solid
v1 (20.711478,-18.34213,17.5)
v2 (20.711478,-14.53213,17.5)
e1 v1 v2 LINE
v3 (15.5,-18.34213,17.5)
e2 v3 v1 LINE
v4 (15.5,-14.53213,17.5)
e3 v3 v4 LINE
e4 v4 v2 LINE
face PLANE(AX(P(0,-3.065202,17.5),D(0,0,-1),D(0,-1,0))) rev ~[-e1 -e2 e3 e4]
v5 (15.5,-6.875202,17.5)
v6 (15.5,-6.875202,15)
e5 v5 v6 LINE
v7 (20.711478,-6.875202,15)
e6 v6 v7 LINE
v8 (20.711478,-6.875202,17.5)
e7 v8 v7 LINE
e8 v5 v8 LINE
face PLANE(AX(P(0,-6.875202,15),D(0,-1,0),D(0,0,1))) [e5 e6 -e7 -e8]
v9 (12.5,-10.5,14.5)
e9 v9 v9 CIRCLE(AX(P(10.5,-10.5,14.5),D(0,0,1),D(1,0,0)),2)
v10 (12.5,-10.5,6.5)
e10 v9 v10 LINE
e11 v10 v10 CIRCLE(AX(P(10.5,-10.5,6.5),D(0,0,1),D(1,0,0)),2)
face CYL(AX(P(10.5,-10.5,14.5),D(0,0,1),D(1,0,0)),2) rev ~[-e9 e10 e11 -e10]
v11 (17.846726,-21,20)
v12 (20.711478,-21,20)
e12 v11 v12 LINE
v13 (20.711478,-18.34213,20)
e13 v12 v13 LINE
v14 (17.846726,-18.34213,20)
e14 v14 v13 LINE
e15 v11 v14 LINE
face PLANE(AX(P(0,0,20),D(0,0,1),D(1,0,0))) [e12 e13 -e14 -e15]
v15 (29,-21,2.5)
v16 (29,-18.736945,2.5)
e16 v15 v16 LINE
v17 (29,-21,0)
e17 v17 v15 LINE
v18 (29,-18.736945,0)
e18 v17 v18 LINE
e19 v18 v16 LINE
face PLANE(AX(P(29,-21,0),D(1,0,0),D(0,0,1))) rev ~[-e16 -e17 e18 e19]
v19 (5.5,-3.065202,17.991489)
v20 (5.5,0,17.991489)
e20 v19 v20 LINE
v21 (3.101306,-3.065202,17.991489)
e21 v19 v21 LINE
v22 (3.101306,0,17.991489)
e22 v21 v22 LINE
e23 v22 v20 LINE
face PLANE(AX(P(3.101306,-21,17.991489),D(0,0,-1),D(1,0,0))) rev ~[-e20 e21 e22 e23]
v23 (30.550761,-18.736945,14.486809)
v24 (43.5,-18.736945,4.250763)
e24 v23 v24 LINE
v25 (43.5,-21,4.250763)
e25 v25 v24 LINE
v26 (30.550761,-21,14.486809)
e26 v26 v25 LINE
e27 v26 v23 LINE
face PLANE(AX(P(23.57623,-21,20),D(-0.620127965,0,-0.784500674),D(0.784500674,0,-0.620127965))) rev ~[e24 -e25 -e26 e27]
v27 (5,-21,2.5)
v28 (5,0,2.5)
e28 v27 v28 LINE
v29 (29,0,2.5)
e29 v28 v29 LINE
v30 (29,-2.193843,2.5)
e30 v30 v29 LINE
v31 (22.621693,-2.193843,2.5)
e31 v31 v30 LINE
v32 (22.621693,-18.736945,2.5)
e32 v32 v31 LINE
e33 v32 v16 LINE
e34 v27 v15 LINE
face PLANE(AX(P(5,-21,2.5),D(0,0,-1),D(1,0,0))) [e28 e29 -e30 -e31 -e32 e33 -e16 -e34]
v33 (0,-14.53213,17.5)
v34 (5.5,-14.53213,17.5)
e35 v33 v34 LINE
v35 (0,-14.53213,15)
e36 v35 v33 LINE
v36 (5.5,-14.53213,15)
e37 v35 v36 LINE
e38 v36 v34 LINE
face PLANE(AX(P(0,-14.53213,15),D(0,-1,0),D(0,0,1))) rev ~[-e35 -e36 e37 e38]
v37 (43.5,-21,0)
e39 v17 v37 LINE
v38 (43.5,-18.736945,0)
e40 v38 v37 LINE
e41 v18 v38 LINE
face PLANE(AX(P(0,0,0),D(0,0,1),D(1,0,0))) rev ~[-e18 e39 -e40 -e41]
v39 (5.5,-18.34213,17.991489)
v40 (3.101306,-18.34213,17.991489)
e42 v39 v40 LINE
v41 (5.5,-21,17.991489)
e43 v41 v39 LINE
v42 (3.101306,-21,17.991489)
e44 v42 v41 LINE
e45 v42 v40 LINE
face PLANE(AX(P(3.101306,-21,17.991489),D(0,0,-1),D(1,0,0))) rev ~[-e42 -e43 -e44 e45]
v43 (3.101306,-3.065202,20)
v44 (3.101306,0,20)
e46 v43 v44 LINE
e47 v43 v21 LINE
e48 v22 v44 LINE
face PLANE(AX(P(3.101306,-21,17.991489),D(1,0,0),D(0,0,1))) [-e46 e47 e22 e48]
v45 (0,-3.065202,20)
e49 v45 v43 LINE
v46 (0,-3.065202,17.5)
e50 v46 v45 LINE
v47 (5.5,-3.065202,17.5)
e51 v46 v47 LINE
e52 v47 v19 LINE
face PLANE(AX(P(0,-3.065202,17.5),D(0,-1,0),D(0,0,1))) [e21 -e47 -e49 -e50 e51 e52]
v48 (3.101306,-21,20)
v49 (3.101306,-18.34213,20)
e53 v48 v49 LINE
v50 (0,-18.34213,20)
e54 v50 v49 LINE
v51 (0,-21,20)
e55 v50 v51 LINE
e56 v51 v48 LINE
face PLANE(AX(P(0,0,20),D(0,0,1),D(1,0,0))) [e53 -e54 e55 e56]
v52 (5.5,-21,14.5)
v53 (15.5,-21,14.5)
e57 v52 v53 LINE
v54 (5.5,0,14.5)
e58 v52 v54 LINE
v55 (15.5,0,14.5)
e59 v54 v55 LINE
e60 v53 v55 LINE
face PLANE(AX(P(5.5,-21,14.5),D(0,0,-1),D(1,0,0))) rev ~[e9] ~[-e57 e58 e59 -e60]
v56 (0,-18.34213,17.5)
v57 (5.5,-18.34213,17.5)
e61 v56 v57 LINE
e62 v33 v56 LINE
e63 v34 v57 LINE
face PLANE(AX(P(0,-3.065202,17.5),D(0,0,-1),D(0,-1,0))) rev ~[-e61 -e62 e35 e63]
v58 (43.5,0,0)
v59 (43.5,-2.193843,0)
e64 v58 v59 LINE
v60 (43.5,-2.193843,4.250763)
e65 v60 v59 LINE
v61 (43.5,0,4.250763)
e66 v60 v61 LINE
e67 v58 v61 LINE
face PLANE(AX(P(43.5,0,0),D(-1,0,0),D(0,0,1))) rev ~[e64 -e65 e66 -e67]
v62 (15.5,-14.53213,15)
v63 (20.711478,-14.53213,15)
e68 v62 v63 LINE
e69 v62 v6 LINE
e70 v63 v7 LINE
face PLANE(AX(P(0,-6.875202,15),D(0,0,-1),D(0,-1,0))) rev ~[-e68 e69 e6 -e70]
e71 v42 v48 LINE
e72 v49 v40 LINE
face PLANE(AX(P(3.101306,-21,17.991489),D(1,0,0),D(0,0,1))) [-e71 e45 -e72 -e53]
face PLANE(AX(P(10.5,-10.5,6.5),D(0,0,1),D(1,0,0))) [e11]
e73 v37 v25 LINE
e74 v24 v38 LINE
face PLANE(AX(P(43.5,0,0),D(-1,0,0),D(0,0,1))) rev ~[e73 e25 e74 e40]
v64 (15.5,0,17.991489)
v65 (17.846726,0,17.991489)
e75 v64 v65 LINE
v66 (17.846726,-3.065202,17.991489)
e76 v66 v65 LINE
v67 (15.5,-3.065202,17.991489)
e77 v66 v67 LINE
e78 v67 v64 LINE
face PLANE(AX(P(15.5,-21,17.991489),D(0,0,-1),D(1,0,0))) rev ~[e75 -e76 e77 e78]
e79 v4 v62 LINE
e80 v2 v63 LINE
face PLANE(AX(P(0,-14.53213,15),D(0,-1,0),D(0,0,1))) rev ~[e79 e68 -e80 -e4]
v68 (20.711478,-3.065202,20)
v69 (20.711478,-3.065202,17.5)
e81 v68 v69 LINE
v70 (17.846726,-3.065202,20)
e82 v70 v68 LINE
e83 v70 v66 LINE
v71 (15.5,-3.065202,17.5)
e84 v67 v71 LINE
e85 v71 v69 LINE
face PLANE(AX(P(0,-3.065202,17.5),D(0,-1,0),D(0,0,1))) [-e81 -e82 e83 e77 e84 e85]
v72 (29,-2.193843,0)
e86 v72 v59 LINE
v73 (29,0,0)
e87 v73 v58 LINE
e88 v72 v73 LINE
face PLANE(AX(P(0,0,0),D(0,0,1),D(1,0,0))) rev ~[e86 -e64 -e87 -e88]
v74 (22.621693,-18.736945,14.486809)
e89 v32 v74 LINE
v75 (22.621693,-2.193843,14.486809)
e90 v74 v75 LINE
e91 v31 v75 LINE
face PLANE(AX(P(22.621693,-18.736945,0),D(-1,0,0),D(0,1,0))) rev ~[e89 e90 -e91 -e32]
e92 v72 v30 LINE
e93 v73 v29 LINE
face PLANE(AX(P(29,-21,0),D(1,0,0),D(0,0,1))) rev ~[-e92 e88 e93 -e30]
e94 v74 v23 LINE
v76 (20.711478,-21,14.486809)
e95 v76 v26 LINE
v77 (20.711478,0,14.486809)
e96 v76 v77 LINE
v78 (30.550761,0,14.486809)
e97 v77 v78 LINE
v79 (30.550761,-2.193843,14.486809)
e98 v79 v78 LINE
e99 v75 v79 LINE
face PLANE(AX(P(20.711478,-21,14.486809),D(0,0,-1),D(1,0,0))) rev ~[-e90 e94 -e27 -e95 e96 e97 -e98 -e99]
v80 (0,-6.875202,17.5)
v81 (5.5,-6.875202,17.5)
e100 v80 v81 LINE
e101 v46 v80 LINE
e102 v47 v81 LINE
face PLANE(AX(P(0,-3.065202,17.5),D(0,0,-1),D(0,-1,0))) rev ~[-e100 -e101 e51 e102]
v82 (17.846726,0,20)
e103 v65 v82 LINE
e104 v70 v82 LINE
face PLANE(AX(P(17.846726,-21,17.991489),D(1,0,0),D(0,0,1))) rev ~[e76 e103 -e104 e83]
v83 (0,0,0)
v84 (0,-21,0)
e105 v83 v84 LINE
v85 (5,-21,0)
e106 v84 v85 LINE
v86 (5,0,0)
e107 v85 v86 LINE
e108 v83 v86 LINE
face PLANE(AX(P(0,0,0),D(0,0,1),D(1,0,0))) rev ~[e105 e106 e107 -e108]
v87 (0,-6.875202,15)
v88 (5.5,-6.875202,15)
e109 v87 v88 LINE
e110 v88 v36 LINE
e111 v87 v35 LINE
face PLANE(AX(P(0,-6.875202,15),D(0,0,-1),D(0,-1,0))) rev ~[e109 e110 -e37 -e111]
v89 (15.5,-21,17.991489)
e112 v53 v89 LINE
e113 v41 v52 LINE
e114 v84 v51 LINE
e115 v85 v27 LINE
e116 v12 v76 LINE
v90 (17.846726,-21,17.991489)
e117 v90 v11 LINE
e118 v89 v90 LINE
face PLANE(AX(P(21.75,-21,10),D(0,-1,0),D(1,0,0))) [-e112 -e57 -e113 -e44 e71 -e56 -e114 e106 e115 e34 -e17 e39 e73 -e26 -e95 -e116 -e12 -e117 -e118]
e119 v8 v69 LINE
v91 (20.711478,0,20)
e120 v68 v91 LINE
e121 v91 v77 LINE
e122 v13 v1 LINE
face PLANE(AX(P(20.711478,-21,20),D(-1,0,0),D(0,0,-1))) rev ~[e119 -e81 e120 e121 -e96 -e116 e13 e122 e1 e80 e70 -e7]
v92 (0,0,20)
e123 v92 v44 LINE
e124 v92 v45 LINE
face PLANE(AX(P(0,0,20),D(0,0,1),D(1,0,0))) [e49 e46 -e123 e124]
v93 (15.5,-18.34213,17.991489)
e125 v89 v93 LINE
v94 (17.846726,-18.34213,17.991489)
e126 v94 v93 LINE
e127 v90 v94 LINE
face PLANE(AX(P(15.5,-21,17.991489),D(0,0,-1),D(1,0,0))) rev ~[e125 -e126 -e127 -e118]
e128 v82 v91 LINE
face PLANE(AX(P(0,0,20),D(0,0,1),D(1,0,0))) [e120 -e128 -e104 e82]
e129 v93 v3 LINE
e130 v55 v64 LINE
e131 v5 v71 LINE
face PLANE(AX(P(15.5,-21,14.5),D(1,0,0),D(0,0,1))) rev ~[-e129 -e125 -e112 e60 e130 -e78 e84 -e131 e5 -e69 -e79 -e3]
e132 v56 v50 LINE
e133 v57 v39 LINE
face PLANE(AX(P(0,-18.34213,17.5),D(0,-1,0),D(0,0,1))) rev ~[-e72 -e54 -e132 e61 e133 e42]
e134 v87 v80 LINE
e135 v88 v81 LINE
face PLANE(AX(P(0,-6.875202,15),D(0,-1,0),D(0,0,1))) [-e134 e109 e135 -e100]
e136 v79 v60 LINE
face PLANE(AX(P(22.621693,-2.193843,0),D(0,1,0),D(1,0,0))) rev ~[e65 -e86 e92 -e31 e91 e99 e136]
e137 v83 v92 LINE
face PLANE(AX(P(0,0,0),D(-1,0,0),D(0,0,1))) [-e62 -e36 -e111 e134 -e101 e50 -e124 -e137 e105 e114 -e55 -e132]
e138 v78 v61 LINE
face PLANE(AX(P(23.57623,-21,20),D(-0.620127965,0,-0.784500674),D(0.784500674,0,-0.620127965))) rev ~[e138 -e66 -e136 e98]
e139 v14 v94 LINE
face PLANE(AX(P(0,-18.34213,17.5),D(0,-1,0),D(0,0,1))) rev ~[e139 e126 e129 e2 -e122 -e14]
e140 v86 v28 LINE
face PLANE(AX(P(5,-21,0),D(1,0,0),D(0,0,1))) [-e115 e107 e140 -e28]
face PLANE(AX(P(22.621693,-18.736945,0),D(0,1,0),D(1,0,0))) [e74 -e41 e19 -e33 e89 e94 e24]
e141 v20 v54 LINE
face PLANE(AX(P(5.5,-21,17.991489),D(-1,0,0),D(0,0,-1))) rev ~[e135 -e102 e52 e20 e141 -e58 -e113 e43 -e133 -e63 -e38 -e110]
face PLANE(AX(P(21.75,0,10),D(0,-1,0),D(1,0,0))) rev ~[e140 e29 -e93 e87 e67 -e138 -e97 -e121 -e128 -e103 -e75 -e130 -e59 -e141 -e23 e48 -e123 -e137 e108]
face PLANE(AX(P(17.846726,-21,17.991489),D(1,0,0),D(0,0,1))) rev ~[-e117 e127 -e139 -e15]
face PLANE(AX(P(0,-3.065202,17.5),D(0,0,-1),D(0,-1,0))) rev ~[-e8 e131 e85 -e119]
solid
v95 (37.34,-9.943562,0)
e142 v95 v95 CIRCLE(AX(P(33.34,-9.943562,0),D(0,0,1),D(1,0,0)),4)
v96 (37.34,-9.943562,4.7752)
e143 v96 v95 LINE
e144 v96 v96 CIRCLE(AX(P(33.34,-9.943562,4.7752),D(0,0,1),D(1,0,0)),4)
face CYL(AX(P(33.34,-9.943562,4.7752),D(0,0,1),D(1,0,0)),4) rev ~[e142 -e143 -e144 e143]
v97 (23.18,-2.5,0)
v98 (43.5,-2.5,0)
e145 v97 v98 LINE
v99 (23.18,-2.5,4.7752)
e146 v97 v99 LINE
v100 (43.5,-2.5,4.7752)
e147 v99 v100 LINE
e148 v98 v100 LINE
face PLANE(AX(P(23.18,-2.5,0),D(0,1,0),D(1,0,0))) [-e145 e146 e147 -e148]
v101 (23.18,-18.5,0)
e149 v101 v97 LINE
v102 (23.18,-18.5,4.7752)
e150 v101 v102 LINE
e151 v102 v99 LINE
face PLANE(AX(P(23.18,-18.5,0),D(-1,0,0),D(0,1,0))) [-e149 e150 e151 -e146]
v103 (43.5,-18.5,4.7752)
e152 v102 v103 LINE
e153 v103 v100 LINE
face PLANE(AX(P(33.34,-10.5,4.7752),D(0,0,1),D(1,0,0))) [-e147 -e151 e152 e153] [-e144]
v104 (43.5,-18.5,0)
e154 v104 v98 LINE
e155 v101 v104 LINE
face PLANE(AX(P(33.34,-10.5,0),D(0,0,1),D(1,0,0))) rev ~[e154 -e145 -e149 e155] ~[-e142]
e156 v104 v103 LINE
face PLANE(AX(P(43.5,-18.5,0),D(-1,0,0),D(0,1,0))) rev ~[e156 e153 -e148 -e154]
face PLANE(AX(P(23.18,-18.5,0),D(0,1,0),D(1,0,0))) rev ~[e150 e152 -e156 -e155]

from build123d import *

# Parameters (mm, degrees)
F0_W      = 43.5
F0_H      = 20
F1_DEPTH  = 21
F2_W      = 24
F2_H      = 2.5
F2_W_2    = 2.3986939639
F2_H_2    = 2.0085112005
F2_W_3    = 2.3467258811
F3_DEPTH  = 21.001
F5_DEPTH  = 21.001
F6_R      = 2
F7_DEPTH  = 8
F9_W      = 15.2769281747
F9_H      = 2.5
F10_DEPTH = 43.501
F11_W     = 7.6569281747
F11_H     = 2.5
F12_DEPTH = 43.501
F15_DEPTH = 21.001
F16_W     = 23.7473566085
F16_H     = 16.5431026835
F17_DEPTH = 25.4
F13_W     = 20.32
F13_H     = 16
F18_DEPTH = 4.7752
F8_R      = 4
F19_DEPTH = 74
F20_R     = 4
F21_DEPTH = 4.7762


# Not quite as in the source:
# - an extrude ends at something that could not be found from the text; its depth is read off the source's solid


with BuildPart() as f1:
    # F0 (on Front) → F1 (new body)
    with BuildSketch(Plane.XZ):
        with Locations((21.75, 10)):
            Rectangle(F0_W, F0_H)
    extrude(amount=F1_DEPTH)

    # F2 (on face) → F3 (cut, through all)
    with BuildSketch(Plane.XZ.offset(21)):
        Polygon((15.5, 20), (5.5, 20), (5.5, 17.9914887995), (5.5, 14.5), (15.5, 14.5), (15.5, 17.9914887995), align=None)
        with Locations((17, 1.25)):
            Rectangle(F2_W, F2_H)
        with Locations((4.3006530181, 18.9957443997)):
            Rectangle(F2_W_2, F2_H_2)
        with Locations((16.6733629405, 18.9957443997)):
            Rectangle(F2_W_3, F2_H_2)
    extrude(amount=-F3_DEPTH, mode=Mode.SUBTRACT)

    # F4 (on face) → F5 (cut, through all)
    with BuildSketch(Plane.XZ.offset(21)):
        Polygon((43.5, 20), (23.5762298107, 20), (43.5, 4.2507629842), align=None)
    extrude(amount=-F5_DEPTH, mode=Mode.SUBTRACT)

    # F6 (on face) → F7 (cut)
    with BuildSketch(Plane.XY.offset(14.5)):
        with Locations((10.5, -10.5)):
            Circle(F6_R)
    extrude(amount=-F7_DEPTH, mode=Mode.SUBTRACT)

    # F9 (on face) → F10 (cut, through all)
    with BuildSketch(Plane(origin=(0, 0, 0), x_dir=(0, -1, 0), z_dir=(-1, 0, 0))):
        with Locations((10.7036660069, 18.75)):
            Rectangle(F9_W, F9_H)
    extrude(amount=-F10_DEPTH, mode=Mode.SUBTRACT)

    # F11 (on face) → F12 (cut, through all)
    with BuildSketch(Plane(origin=(0, 0, 0), x_dir=(0, -1, 0), z_dir=(-1, 0, 0))):
        with Locations((10.7036660069, 16.25)):
            Rectangle(F11_W, F11_H)
    extrude(amount=-F12_DEPTH, mode=Mode.SUBTRACT)

    # F14 (on face) → F15 (cut, through all)
    with BuildSketch(Plane.XZ.offset(21)):
        Polygon((23.5762298107, 20), (20.7114778459, 20), (20.7114778459, 14.4868092611), (30.5507610328, 14.4868092611), align=None)
    extrude(amount=-F15_DEPTH, mode=Mode.SUBTRACT)

    # F16 (on Top) → F17 (cut)
    with BuildSketch(Plane.XY):
        with Locations((34.4953713939, -10.4653941235)):
            Rectangle(F16_W, F16_H)
    extrude(amount=F17_DEPTH, mode=Mode.SUBTRACT)

    # F8 (on face) → F19 (cut, through all)
    with BuildSketch(Plane(origin=(0, 0, 0), x_dir=(1, 0, 0), z_dir=(0, 0, -1))):
        with Locations((36.25, 10.5)):
            Circle(F8_R)
    extrude(amount=F19_DEPTH, mode=Mode.SUBTRACT)


with BuildPart() as f18:
    # F13 (on Top) → F18 (new body)
    with BuildSketch(Plane.XY):
        with Locations((33.34, -10.5)):
            Rectangle(F13_W, F13_H)
    extrude(amount=F18_DEPTH)

    # F20 (on face) → F21 (cut, through all)
    with BuildSketch(Plane.XY.offset(4.7752)):
        with Locations((33.34, -9.9435616285)):
            Circle(F20_R)
    extrude(amount=-F21_DEPTH, mode=Mode.SUBTRACT)


solid = Compound([f1.part, f18.part])
